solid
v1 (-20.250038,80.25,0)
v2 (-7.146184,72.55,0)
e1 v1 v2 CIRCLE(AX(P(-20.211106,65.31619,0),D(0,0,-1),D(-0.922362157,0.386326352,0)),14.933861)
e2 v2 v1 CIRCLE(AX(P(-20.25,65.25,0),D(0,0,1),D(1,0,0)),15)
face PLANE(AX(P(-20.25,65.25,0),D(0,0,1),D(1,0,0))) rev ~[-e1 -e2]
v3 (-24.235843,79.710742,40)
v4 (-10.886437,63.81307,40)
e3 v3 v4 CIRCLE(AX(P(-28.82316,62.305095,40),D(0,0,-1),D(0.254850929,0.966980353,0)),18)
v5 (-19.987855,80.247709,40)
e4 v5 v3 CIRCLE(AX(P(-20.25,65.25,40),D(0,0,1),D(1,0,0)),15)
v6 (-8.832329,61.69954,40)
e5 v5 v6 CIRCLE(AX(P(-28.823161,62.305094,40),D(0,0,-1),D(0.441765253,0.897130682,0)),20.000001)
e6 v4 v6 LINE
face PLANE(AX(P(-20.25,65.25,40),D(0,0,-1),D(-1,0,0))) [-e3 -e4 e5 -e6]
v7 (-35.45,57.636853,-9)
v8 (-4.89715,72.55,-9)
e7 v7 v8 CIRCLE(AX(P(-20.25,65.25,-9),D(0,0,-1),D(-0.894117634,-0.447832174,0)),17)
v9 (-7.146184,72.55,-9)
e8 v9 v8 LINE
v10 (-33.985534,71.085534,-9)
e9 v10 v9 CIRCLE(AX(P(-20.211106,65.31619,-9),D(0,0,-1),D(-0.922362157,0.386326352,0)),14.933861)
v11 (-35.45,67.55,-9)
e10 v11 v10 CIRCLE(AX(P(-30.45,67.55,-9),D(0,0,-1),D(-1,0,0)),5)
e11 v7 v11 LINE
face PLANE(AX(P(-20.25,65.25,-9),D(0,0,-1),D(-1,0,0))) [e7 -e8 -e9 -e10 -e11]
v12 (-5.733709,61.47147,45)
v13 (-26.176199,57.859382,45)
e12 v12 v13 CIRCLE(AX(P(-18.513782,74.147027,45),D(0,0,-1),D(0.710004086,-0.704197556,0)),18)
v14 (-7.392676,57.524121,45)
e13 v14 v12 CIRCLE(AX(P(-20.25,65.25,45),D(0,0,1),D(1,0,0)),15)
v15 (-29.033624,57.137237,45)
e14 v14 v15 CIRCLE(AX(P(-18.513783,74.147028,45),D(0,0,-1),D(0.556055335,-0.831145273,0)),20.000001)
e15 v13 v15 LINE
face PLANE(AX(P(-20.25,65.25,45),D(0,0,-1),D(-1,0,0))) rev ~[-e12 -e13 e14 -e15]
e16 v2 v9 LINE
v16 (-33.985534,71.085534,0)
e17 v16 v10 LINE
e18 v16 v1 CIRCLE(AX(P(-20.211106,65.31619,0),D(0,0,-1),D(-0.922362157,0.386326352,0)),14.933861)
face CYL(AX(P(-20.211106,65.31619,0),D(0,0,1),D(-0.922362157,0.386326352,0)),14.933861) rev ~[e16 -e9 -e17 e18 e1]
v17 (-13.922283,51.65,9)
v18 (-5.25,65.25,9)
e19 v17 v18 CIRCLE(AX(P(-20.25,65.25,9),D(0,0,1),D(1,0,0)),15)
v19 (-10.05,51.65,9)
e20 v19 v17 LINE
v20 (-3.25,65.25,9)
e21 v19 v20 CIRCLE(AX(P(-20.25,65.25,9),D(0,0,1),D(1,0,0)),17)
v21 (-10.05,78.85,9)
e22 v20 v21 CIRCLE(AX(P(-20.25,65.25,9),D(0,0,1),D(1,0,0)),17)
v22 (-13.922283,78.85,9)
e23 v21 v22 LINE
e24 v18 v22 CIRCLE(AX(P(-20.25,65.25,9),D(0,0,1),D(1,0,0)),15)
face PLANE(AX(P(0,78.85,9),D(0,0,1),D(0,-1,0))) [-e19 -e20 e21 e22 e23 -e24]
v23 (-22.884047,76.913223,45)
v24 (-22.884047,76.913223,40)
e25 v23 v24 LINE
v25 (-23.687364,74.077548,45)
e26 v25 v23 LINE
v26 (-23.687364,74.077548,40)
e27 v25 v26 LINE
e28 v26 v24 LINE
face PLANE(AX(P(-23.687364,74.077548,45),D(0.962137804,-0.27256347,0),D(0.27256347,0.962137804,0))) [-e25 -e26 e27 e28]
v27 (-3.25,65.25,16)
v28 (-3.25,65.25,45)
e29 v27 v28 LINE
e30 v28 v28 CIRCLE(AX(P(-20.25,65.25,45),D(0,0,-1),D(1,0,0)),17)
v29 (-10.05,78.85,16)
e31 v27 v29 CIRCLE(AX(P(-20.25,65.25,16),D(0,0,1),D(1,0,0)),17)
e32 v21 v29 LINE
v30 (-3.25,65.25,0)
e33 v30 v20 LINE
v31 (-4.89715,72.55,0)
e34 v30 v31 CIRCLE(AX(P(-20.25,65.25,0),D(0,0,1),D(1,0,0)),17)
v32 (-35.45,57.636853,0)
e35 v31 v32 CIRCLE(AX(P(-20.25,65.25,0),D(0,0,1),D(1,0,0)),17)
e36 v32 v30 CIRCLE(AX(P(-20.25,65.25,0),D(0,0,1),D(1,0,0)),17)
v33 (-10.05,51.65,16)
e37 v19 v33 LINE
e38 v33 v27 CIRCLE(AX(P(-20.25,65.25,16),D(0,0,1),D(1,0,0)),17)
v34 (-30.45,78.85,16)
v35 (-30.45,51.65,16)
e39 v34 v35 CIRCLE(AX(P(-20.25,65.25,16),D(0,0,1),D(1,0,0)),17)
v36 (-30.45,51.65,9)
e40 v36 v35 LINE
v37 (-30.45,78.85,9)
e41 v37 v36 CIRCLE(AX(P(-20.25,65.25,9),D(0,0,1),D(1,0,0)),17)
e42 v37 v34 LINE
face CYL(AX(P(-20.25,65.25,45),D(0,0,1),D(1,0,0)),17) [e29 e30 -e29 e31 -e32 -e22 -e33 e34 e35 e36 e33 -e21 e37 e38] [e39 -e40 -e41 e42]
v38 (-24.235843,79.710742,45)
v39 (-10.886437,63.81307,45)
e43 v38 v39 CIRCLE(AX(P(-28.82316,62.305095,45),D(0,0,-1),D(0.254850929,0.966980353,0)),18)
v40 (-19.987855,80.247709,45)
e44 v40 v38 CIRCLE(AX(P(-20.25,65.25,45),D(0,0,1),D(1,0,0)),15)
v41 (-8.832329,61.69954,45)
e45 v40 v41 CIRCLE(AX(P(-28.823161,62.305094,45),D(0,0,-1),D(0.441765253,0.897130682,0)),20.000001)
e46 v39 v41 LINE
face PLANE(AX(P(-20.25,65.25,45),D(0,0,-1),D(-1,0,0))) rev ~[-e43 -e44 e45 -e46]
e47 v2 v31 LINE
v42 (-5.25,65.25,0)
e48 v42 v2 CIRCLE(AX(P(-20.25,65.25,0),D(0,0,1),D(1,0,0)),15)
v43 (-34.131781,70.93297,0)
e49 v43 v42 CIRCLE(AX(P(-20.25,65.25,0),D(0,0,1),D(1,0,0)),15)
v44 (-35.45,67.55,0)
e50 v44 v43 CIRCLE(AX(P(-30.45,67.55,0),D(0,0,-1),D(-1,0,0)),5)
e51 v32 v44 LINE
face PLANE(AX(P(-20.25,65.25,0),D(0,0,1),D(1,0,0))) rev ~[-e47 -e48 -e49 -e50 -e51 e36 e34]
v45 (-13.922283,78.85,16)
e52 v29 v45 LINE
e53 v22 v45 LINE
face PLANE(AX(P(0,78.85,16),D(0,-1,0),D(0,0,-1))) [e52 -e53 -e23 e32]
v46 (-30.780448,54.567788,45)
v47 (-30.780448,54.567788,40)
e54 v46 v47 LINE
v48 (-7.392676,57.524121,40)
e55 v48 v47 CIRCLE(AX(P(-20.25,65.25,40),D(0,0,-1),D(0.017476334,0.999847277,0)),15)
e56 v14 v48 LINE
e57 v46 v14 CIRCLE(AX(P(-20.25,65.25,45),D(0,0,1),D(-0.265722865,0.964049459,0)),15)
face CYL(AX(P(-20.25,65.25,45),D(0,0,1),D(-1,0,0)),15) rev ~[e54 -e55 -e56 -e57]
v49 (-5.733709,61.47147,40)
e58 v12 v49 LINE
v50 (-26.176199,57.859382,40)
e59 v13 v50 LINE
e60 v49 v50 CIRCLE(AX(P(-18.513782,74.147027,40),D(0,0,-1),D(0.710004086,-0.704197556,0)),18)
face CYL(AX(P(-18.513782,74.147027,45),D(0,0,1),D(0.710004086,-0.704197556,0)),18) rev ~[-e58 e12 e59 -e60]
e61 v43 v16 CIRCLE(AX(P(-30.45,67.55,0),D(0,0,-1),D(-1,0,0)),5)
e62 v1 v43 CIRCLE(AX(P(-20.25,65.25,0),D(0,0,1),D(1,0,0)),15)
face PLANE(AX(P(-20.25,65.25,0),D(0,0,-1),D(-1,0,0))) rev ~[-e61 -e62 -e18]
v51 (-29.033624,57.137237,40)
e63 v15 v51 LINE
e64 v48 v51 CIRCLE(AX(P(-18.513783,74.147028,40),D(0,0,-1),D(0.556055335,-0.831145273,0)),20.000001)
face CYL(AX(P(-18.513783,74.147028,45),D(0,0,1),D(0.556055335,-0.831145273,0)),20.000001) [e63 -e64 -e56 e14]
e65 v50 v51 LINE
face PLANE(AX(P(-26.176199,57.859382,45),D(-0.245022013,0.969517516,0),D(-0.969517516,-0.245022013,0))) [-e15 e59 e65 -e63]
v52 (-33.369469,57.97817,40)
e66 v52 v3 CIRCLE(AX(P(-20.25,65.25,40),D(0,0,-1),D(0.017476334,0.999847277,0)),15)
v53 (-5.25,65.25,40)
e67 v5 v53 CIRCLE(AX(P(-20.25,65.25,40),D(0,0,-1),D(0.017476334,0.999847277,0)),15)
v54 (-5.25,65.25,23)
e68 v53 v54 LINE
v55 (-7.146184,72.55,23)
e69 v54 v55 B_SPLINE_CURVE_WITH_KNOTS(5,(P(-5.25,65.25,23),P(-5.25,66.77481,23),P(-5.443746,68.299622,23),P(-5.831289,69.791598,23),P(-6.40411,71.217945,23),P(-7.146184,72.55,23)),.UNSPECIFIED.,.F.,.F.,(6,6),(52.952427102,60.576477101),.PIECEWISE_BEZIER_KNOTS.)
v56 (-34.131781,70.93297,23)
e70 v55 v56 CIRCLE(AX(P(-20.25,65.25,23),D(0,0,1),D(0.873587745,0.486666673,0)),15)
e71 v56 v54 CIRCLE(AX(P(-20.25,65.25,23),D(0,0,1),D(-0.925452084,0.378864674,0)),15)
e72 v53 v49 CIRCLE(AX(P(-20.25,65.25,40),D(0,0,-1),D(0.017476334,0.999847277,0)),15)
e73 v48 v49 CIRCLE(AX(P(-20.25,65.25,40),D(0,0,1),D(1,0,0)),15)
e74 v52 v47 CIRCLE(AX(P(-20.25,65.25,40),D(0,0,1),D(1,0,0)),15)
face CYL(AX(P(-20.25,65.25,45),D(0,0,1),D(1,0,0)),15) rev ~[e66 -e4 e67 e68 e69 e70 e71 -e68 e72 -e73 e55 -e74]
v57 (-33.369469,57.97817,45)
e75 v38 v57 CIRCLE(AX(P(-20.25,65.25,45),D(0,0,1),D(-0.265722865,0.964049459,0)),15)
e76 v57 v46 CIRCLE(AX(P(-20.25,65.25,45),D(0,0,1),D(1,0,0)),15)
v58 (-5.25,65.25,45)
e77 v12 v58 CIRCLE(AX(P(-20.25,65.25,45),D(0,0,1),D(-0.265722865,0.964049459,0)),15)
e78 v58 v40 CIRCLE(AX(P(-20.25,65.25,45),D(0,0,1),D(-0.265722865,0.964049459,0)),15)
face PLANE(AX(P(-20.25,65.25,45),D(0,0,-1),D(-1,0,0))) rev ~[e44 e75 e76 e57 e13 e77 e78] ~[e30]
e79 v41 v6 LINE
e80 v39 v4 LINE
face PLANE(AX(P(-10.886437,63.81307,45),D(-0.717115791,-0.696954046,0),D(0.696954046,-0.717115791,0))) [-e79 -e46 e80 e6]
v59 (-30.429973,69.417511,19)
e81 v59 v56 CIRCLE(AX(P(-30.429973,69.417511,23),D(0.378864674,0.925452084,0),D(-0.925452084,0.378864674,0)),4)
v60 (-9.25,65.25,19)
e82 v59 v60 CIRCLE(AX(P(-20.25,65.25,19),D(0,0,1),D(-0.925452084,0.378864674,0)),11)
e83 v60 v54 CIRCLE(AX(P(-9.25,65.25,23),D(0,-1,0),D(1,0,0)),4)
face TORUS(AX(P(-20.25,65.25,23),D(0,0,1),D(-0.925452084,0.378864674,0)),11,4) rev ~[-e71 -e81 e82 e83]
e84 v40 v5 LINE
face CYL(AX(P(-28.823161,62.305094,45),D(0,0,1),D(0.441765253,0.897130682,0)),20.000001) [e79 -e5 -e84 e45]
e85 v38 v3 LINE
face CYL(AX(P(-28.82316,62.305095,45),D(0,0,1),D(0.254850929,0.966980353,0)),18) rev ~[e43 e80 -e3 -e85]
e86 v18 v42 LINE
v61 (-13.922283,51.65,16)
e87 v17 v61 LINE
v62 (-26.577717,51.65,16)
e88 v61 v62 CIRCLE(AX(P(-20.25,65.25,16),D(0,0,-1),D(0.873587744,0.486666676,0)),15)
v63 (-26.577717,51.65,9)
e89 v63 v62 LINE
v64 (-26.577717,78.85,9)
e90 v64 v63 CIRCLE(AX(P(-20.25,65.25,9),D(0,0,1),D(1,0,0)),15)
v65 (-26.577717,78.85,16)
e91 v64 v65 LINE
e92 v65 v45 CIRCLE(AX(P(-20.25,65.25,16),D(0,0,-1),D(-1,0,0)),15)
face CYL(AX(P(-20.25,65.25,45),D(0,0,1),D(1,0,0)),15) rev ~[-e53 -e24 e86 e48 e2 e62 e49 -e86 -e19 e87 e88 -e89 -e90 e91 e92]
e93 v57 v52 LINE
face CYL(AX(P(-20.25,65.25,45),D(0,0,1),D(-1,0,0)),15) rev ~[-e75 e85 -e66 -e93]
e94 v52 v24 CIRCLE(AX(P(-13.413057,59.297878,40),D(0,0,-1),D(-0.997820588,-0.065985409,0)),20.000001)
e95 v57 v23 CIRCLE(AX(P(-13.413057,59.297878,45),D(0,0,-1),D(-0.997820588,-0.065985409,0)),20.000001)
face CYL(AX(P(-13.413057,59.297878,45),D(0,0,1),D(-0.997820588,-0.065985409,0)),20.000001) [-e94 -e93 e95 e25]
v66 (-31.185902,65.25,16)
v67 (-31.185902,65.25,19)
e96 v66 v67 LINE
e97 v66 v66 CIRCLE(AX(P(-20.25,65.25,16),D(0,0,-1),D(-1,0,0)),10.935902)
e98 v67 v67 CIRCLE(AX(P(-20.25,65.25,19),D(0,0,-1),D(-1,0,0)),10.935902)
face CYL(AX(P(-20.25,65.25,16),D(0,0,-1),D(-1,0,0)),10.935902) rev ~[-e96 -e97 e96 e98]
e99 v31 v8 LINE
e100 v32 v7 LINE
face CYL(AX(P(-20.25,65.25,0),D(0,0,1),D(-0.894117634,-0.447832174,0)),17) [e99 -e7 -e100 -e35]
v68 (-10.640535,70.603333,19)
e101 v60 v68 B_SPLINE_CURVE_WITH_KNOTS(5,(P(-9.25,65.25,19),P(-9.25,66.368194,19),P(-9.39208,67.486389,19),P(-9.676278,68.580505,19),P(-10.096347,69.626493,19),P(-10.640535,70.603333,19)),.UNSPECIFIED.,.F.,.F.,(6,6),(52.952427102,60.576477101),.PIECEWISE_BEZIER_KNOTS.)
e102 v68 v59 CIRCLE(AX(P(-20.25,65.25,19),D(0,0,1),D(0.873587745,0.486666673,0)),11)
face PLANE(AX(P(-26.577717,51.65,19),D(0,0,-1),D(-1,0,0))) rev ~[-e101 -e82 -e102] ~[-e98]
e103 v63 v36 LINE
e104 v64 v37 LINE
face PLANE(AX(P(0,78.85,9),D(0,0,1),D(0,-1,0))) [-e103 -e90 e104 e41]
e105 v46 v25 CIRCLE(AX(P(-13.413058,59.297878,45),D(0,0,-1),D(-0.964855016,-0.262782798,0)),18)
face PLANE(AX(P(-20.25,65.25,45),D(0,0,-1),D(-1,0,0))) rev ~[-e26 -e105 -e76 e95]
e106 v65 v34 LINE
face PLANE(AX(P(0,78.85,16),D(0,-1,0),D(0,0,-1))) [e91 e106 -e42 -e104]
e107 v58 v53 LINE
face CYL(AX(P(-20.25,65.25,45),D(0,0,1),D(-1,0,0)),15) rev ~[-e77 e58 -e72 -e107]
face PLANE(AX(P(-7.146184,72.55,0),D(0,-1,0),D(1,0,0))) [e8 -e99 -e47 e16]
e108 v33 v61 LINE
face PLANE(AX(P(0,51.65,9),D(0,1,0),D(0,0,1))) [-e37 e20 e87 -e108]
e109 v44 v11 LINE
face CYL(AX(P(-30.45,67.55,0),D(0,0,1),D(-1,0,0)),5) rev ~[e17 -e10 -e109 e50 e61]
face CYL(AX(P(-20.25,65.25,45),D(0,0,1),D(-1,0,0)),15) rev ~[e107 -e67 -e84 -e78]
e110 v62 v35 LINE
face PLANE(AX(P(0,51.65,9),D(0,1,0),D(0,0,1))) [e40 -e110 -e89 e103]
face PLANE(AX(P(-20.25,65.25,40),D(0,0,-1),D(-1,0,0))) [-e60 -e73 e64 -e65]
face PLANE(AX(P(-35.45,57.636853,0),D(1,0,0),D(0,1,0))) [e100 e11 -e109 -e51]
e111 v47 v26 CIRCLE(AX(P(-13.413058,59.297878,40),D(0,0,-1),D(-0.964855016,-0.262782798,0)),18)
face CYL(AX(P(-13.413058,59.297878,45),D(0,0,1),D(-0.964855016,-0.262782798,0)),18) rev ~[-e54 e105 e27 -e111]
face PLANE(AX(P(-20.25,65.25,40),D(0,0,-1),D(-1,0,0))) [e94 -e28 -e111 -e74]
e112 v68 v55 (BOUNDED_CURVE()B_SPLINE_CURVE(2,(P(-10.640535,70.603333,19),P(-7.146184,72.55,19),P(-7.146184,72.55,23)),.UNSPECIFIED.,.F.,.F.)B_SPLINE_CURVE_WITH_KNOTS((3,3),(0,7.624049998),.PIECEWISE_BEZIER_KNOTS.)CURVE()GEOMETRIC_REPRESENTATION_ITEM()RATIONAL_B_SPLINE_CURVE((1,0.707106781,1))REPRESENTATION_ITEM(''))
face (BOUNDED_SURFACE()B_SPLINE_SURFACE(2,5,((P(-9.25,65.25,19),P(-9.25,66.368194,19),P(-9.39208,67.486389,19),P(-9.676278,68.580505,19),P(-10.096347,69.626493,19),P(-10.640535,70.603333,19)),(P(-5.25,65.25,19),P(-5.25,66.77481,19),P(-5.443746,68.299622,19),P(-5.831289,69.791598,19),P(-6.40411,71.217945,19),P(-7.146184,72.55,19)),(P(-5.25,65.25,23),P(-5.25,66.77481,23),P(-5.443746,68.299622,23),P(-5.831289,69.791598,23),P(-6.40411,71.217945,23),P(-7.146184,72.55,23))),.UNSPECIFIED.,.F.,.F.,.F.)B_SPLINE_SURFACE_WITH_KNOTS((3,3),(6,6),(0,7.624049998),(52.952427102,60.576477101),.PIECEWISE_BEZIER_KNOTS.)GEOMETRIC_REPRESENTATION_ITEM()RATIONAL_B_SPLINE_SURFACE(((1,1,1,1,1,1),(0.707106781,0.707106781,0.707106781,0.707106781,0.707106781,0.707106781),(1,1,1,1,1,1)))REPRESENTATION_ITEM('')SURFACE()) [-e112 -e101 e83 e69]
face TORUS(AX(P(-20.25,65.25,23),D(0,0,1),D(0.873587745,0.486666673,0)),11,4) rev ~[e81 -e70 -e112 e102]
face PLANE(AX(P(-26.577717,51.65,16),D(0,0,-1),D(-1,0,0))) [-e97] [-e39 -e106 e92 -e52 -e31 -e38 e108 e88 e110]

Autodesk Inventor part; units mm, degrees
ref_plane "YZ Plane" through (0, 0, 0) normal (1, 0, 0) x (0, 1, 0)
ref_plane "Work Plane1" through (-20.25, 65.25, 45) normal (0, 0, -1) x (-1, 0, 0)
sketch "Sketch1" plane through (-20.25, 65.25, 45) normal (0, 0, -1) x (-1, 0, 0)
  circle A0 centre (0, 0) radius 15 construction
  circle A1 centre (0, 0) radius 15
  arc A2 (3.985843, 14.460742) -> (-9.363563, -1.43693) centre (8.57316, -2.944905) ccw
  arc A3 (-0.262145, 14.997709) -> (-11.417671, -3.55046) centre (8.57316, -2.944905) ccw
  circle A4 centre (0, 0) radius 17
  arc A5 (-3.177912, 14.659498) -> (-0.262145, 14.997709) centre (0, 0) ccw
  line L0 (-9.363563, -1.43693) -> (-11.417671, -3.55046)
  point P0 (-20.25, -65.25)
  dimension "d0" = 30
  dimension "d1" = 18
  dimension "d2" = 20
  dimension "d3" = 34
extrude "Extrusion1" add sketch "Sketch1" along normal blind 5 contours A2 L0 A3 A1 | A4 picked at (-9.618407, 0.814563)
pattern_circular "Circular Pattern1" count 3 over 360 about axis through (-20.25, 65.25, 45) along (0, 0, -1) of "Extrusion1"
sketch "Sketch2" plane through (-20.25, 65.25, 45) normal (0, 0, 1) x (1, 0, 0)
  circle A0 centre (0, 0) radius 17 projected
  circle A1 centre (0, 0) radius 15
  point P0 (20.25, -65.25)
ref_plane "Work Plane2" through (-33.45, -70.55, 0) normal (0, 0, 1) x (1, 0, 0)
extrude "Extrusion2" add sketch "Sketch2" against normal up to surface (45 mm away)
sketch "Sketch3" plane through (-20.25, 65.25, 0) normal (0, 0, -1) x (-1, 0, 0)
  circle A0 centre (0, 0) radius 15 construction
  circle A1 centre (0, 0) radius 17 construction
  line L0 (15.2, -132.8) -> (15.2, 2.3)
  arc A2 (15.2, 2.3) -> (10.2, 7.3) centre (10.2, 2.3) ccw
  line L1 (10.2, 7.3) -> (-50.7, 7.3)
  circle A3 centre (0, 0) radius 17 construction
  arc A4 (13.11947, -7.271831) -> (3.985843, 14.460742) centre (0, 0) ccw construction
  arc A5 (15.2, -7.613147) -> (-15.35285, 7.3) centre (0, 0) ccw
  arc A6 (13.735534, 5.835534) -> (-13.103816, 7.3) centre (-0.038894, 0.06619) ccw
  point P0 (-20.25, -65.25)
ref_plane "Work Plane3" through (-33.45, -70.55, -7.1) normal (0, 0, -1) x (0, 1, 0)
extrude "Extrusion3" add sketch "Sketch3" along normal blind 9 contours L0 A2 A6 L1 A5
sketch "Sketch4" plane through (0, 0, 0) normal (1, 0, 0) x (0, 1, 0)
  line L0 (52.65, 10) -> (77.85, 10) construction
  line L1 (77.85, 15) -> (52.65, 15) construction
  line L2 (52.65, 10) -> (52.65, 15) construction
  line L3 (77.85, 10) -> (77.85, 15) construction
  line L4 (52.65, 10) -> (77.85, 10) construction
  line L5 (77.85, 10) -> (77.85, 15) construction
  line L6 (77.85, 15) -> (52.65, 15) construction
  line L7 (52.65, 15) -> (52.65, 10) construction
  line L8 (51.65, 16) -> (78.85, 16)
  line L9 (78.85, 16) -> (78.85, 9)
  line L10 (78.85, 9) -> (51.65, 9)
  line L11 (51.65, 9) -> (51.65, 16)
  point P0 (0, 0)
  dimension "d13" = 1
extrude "Extrusion4" cut sketch "Sketch4" against normal through all
sketch "Sketch5" plane through (-26.577717, 51.65, 16) normal (0, 0, -1) x (-1, 0, 0)
  arc A0 (-19.431533, 20.9) -> (7.554064, 19.28297) centre (-6.327717, 13.6) ccw
  circle A1 centre (-6.327717, 13.6) radius 15
  circle A2 centre (-6.327717, 13.6) radius 10.935902
  point P0 (-26.577717, -51.65)
extrude "Extrusion5" add sketch "Sketch5" against normal blind 3
fillet "Fillet1" radius 4 1 edges at (-35.25, 65.25, 19)
properties part number "10_P9_RMS_Fluofilter"
